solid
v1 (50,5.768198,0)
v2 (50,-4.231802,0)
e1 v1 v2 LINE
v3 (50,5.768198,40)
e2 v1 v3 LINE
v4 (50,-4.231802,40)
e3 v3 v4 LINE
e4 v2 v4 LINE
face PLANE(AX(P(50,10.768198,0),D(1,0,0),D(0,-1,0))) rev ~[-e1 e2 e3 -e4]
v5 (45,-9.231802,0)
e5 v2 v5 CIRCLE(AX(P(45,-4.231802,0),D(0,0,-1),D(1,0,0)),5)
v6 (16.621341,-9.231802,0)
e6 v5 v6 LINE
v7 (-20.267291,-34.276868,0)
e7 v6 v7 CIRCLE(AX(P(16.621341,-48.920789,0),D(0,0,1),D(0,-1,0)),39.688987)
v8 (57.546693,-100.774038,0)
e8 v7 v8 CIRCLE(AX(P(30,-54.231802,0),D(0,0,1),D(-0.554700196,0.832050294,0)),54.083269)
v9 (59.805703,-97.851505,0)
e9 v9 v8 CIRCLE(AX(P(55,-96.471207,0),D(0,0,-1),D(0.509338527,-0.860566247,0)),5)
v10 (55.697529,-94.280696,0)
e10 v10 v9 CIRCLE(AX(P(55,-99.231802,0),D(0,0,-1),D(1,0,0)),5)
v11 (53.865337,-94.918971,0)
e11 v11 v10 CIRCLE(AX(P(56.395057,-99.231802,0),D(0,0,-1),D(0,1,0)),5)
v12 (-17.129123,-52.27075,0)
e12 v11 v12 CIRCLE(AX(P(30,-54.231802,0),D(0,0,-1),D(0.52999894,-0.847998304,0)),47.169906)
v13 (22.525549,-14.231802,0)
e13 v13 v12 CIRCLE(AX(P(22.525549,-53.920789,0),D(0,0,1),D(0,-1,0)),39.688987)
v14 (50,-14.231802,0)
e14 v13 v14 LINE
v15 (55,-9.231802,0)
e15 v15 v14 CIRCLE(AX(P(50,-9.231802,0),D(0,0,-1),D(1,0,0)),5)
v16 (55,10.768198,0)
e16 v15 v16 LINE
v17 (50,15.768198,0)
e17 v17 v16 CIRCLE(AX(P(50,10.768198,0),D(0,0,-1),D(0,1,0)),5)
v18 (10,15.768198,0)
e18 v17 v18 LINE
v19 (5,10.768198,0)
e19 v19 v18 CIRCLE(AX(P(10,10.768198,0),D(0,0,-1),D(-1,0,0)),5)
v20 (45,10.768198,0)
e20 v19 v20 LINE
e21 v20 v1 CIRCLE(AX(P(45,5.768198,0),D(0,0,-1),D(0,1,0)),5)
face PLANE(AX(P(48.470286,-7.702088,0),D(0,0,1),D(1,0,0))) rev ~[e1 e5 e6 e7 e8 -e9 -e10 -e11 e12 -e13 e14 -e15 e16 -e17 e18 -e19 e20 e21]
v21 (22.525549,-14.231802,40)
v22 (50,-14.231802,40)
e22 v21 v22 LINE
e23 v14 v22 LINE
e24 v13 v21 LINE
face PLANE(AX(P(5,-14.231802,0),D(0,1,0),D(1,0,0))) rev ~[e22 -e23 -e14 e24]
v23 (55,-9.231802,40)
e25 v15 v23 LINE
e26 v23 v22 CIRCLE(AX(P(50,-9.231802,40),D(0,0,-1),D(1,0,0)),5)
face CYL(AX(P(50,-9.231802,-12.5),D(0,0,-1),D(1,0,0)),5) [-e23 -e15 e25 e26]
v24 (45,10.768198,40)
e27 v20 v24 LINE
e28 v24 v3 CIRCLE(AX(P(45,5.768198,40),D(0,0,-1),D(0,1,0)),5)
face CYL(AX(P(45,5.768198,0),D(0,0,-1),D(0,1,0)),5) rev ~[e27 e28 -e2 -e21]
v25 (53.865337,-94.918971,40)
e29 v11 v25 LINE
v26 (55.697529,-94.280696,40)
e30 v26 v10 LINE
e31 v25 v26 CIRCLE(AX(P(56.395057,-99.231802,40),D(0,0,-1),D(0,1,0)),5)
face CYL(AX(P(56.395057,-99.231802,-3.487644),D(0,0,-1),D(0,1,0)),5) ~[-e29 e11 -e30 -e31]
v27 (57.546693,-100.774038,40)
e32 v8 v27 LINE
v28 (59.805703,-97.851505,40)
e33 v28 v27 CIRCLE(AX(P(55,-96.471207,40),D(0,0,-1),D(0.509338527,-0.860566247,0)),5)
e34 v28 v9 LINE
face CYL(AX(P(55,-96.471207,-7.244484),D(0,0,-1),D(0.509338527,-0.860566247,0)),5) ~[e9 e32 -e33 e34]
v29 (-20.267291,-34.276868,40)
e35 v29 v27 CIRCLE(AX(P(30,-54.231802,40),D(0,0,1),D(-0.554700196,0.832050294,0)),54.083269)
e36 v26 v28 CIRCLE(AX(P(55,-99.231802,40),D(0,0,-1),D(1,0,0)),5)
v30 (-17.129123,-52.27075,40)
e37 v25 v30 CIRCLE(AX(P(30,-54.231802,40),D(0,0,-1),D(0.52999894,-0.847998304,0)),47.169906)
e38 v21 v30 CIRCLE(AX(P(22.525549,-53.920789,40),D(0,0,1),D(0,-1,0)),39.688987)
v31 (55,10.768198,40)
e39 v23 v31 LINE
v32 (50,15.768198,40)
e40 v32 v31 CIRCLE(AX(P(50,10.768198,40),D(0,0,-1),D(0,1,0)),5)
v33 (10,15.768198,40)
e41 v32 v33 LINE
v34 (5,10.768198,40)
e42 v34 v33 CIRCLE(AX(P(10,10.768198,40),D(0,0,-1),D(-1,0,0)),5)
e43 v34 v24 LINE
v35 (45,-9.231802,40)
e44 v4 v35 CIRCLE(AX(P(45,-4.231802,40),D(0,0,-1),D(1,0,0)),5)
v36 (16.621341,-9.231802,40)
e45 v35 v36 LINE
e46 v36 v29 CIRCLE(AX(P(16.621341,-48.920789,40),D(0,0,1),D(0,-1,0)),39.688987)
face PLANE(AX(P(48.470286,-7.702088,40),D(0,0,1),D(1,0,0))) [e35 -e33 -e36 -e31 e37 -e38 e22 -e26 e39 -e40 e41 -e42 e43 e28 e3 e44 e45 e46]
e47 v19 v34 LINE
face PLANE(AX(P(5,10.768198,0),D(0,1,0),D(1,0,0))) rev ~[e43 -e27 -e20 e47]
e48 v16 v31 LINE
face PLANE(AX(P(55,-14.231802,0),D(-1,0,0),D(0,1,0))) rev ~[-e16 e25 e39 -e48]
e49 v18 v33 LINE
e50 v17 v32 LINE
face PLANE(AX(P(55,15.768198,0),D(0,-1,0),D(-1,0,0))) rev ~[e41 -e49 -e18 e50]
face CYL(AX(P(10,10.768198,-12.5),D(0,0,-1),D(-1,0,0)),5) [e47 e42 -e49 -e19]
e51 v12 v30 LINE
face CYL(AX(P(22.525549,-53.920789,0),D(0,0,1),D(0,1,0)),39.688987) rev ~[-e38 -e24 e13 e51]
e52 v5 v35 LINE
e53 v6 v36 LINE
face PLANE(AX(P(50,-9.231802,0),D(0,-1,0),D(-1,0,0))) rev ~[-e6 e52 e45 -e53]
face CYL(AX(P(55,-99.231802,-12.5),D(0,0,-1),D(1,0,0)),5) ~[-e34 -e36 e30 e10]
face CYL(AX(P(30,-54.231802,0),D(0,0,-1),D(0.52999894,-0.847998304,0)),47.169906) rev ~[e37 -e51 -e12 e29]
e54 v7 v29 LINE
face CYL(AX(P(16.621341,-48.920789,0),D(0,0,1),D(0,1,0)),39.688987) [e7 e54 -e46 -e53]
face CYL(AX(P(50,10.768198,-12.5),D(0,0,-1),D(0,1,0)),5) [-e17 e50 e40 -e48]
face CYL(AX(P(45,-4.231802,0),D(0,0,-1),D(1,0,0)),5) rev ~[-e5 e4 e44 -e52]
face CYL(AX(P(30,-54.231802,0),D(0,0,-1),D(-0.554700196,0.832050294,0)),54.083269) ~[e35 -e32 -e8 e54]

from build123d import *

# Parameters (mm, degrees)
F0_W        = 45
F0_H        = 5
F1_DEPTH    = 40
F2_T1_DEPTH = 40
F2_T3_DEPTH = 65
F2_T5_DEPTH = 54.4889687993
F2_T7_DEPTH = 46.9752871377
F3_R        = 39.6889865909


# Not quite as in the source:
# - a fillet or chamfer that OpenCascade refuses, or shapes differently, is made with other operations: its cross-section is extruded or revolved along the edge and cut away or added


with BuildPart() as f1:
    # F0 (on Top) → F1 (new body)
    with BuildSketch(Plane.XY):
        with Locations((27.5, 13.2681977808)):
            Rectangle(F0_W, F0_H)
        with BuildLine():
            Line((50, 10.7681977808), (50, -3.9824241135))
            ThreePointArc((50, -3.9824241135), (52.5291420669, -5.0643561015), (55, -6.273486986))
            Line((55, -6.273486986), (55, 15.7681977808))
            Line((55, 15.7681977808), (50, 15.7681977808))
            Line((50, 15.7681977808), (50, 10.7681977808))
        make_face()
        with BuildLine():
            ThreePointArc((55, -6.273486986), (52.5291420669, -5.0643561015), (50, -3.9824241135))
            Line((50, -3.9824241135), (50, -9.2318022192))
            Line((50, -9.2318022192), (50, -11.5117834926))
            ThreePointArc((50, -11.5117834926), (52.5410653135, -12.7963056669), (55, -14.2318022192))
            Line((55, -14.2318022192), (55, -6.273486986))
        make_face()
        with BuildLine():
            Line((15.8578643763, -9.2318022192), (5, -9.2318022192))
            Line((5, -9.2318022192), (5, -14.2318022192))
            ThreePointArc((5, -14.2318022192), (10.2699038194, -11.3864605272), (15.8578643763, -9.2318022192))
        make_face()
        with BuildLine():
            Line((5, -14.2318022192), (5, -9.2318022192))
            Line((5, -9.2318022192), (0, -9.2318022192))
            ThreePointArc((0, -9.2318022192), (-15, -84.2318022192), (60, -99.2318022192))
            Line((60, -99.2318022192), (60, -94.2318022192))
            Line((60, -94.2318022192), (55, -94.2318022192))
            ThreePointArc((55, -94.2318022192), (-10, -79.2318022192), (5, -14.2318022192))
        make_face()
        with BuildLine():
            ThreePointArc((15.8578643763, -9.2318022192), (10.2699038194, -11.3864605272), (5, -14.2318022192))
            Line((5, -14.2318022192), (50, -14.2318022192))
            Line((50, -14.2318022192), (50, -11.5117834926))
            ThreePointArc((50, -11.5117834926), (47.1090892478, -10.2741059066), (44.1421356237, -9.2318022192))
            Line((44.1421356237, -9.2318022192), (15.8578643763, -9.2318022192))
        make_face()
        with BuildLine():
            Line((50, -9.2318022192), (44.1421356237, -9.2318022192))
            ThreePointArc((44.1421356237, -9.2318022192), (47.1090892478, -10.2741059066), (50, -11.5117834926))
            Line((50, -11.5117834926), (50, -9.2318022192))
        make_face()
        with BuildLine():
            Line((50, -11.5117834926), (50, -14.2318022192))
            Line((50, -14.2318022192), (55, -14.2318022192))
            ThreePointArc((55, -14.2318022192), (52.5410653135, -12.7963056669), (50, -11.5117834926))
        make_face()
    extrude(amount=F1_DEPTH)

    # F2: fillet of radius 5 on 8 edges, made by hand

    # F2_s2 → F2_t1 (join)
    with BuildSketch(Plane.XY):
        with BuildLine():
            ThreePointArc((50, -4.2318022192), (48.5355339059, -7.7673361251), (45, -9.2318022192))
            Line((45, -9.2318022192), (50, -9.2318022192))
            Line((50, -9.2318022192), (50, -4.2318022192))
        make_face()
        with BuildLine():
            ThreePointArc((45, 10.7681977808), (48.5355339059, 9.3037316868), (50, 5.7681977808))
            Line((50, 5.7681977808), (50, 10.7681977808))
            Line((50, 10.7681977808), (45, 10.7681977808))
        make_face()
    extrude(amount=F2_T1_DEPTH)

    # F2_s4 → F2_t3 (cut)
    with BuildSketch(Plane.XY.offset(-12.5)):
        with BuildLine():
            ThreePointArc((55, -9.2318022192), (53.5355339059, -12.7673361251), (50, -14.2318022192))
            Line((50, -14.2318022192), (55, -14.2318022192))
            Line((55, -14.2318022192), (55, -9.2318022192))
        make_face()
        with BuildLine():
            ThreePointArc((50, 15.7681977808), (53.5355339059, 14.3037316868), (55, 10.7681977808))
            Line((55, 10.7681977808), (55, 15.7681977808))
            Line((55, 15.7681977808), (50, 15.7681977808))
        make_face()
        with BuildLine():
            ThreePointArc((5, 10.7681977808), (6.4644660941, 14.3037316868), (10, 15.7681977808))
            Line((10, 15.7681977808), (5, 15.7681977808))
            Line((5, 15.7681977808), (5, 10.7681977808))
        make_face()
        with BuildLine():
            ThreePointArc((60, -99.2318022192), (58.5355339059, -95.6962683132), (55, -94.2318022192))
            Line((55, -94.2318022192), (60, -94.2318022192))
            Line((60, -94.2318022192), (60, -99.2318022192))
        make_face()
    extrude(amount=F2_T3_DEPTH, mode=Mode.SUBTRACT)

    # F2_s6 → F2_t5 (cut)
    with BuildSketch(Plane.XY.offset(-7.2444843997)):
        with BuildLine():
            ThreePointArc((57.546692635, -100.7740381439), (59.3435851077, -98.9477505529), (60, -96.4712069105))
            Line((60, -96.4712069105), (60, -99.2318022192))
            ThreePointArc((60, -99.2318022192), (58.7836773401, -100.019354226), (57.546692635, -100.7740381439))
        make_face()
    extrude(amount=F2_T5_DEPTH, mode=Mode.SUBTRACT)

    # F2_s8 → F2_t7 (cut)
    with BuildSketch(Plane.XY.offset(-3.4876435688)):
        with BuildLine():
            ThreePointArc((56.3950574275, -94.2318022192), (55.0843622501, -94.4066516358), (53.8653367875, -94.9189709584))
            ThreePointArc((53.8653367875, -94.9189709584), (54.4350841017, -94.5793754416), (55, -94.2318022192))
            Line((55, -94.2318022192), (56.3950574275, -94.2318022192))
        make_face()
    extrude(amount=F2_T7_DEPTH, mode=Mode.SUBTRACT)

    # F3
    f3_edges = [f1.edges().sort_by_distance(p)[0] for p in [
        (0, -9.231802, 20),
        (5, -14.231802, 20),
    ]]
    fillet(f3_edges, radius=F3_R)


solid = f1.part
